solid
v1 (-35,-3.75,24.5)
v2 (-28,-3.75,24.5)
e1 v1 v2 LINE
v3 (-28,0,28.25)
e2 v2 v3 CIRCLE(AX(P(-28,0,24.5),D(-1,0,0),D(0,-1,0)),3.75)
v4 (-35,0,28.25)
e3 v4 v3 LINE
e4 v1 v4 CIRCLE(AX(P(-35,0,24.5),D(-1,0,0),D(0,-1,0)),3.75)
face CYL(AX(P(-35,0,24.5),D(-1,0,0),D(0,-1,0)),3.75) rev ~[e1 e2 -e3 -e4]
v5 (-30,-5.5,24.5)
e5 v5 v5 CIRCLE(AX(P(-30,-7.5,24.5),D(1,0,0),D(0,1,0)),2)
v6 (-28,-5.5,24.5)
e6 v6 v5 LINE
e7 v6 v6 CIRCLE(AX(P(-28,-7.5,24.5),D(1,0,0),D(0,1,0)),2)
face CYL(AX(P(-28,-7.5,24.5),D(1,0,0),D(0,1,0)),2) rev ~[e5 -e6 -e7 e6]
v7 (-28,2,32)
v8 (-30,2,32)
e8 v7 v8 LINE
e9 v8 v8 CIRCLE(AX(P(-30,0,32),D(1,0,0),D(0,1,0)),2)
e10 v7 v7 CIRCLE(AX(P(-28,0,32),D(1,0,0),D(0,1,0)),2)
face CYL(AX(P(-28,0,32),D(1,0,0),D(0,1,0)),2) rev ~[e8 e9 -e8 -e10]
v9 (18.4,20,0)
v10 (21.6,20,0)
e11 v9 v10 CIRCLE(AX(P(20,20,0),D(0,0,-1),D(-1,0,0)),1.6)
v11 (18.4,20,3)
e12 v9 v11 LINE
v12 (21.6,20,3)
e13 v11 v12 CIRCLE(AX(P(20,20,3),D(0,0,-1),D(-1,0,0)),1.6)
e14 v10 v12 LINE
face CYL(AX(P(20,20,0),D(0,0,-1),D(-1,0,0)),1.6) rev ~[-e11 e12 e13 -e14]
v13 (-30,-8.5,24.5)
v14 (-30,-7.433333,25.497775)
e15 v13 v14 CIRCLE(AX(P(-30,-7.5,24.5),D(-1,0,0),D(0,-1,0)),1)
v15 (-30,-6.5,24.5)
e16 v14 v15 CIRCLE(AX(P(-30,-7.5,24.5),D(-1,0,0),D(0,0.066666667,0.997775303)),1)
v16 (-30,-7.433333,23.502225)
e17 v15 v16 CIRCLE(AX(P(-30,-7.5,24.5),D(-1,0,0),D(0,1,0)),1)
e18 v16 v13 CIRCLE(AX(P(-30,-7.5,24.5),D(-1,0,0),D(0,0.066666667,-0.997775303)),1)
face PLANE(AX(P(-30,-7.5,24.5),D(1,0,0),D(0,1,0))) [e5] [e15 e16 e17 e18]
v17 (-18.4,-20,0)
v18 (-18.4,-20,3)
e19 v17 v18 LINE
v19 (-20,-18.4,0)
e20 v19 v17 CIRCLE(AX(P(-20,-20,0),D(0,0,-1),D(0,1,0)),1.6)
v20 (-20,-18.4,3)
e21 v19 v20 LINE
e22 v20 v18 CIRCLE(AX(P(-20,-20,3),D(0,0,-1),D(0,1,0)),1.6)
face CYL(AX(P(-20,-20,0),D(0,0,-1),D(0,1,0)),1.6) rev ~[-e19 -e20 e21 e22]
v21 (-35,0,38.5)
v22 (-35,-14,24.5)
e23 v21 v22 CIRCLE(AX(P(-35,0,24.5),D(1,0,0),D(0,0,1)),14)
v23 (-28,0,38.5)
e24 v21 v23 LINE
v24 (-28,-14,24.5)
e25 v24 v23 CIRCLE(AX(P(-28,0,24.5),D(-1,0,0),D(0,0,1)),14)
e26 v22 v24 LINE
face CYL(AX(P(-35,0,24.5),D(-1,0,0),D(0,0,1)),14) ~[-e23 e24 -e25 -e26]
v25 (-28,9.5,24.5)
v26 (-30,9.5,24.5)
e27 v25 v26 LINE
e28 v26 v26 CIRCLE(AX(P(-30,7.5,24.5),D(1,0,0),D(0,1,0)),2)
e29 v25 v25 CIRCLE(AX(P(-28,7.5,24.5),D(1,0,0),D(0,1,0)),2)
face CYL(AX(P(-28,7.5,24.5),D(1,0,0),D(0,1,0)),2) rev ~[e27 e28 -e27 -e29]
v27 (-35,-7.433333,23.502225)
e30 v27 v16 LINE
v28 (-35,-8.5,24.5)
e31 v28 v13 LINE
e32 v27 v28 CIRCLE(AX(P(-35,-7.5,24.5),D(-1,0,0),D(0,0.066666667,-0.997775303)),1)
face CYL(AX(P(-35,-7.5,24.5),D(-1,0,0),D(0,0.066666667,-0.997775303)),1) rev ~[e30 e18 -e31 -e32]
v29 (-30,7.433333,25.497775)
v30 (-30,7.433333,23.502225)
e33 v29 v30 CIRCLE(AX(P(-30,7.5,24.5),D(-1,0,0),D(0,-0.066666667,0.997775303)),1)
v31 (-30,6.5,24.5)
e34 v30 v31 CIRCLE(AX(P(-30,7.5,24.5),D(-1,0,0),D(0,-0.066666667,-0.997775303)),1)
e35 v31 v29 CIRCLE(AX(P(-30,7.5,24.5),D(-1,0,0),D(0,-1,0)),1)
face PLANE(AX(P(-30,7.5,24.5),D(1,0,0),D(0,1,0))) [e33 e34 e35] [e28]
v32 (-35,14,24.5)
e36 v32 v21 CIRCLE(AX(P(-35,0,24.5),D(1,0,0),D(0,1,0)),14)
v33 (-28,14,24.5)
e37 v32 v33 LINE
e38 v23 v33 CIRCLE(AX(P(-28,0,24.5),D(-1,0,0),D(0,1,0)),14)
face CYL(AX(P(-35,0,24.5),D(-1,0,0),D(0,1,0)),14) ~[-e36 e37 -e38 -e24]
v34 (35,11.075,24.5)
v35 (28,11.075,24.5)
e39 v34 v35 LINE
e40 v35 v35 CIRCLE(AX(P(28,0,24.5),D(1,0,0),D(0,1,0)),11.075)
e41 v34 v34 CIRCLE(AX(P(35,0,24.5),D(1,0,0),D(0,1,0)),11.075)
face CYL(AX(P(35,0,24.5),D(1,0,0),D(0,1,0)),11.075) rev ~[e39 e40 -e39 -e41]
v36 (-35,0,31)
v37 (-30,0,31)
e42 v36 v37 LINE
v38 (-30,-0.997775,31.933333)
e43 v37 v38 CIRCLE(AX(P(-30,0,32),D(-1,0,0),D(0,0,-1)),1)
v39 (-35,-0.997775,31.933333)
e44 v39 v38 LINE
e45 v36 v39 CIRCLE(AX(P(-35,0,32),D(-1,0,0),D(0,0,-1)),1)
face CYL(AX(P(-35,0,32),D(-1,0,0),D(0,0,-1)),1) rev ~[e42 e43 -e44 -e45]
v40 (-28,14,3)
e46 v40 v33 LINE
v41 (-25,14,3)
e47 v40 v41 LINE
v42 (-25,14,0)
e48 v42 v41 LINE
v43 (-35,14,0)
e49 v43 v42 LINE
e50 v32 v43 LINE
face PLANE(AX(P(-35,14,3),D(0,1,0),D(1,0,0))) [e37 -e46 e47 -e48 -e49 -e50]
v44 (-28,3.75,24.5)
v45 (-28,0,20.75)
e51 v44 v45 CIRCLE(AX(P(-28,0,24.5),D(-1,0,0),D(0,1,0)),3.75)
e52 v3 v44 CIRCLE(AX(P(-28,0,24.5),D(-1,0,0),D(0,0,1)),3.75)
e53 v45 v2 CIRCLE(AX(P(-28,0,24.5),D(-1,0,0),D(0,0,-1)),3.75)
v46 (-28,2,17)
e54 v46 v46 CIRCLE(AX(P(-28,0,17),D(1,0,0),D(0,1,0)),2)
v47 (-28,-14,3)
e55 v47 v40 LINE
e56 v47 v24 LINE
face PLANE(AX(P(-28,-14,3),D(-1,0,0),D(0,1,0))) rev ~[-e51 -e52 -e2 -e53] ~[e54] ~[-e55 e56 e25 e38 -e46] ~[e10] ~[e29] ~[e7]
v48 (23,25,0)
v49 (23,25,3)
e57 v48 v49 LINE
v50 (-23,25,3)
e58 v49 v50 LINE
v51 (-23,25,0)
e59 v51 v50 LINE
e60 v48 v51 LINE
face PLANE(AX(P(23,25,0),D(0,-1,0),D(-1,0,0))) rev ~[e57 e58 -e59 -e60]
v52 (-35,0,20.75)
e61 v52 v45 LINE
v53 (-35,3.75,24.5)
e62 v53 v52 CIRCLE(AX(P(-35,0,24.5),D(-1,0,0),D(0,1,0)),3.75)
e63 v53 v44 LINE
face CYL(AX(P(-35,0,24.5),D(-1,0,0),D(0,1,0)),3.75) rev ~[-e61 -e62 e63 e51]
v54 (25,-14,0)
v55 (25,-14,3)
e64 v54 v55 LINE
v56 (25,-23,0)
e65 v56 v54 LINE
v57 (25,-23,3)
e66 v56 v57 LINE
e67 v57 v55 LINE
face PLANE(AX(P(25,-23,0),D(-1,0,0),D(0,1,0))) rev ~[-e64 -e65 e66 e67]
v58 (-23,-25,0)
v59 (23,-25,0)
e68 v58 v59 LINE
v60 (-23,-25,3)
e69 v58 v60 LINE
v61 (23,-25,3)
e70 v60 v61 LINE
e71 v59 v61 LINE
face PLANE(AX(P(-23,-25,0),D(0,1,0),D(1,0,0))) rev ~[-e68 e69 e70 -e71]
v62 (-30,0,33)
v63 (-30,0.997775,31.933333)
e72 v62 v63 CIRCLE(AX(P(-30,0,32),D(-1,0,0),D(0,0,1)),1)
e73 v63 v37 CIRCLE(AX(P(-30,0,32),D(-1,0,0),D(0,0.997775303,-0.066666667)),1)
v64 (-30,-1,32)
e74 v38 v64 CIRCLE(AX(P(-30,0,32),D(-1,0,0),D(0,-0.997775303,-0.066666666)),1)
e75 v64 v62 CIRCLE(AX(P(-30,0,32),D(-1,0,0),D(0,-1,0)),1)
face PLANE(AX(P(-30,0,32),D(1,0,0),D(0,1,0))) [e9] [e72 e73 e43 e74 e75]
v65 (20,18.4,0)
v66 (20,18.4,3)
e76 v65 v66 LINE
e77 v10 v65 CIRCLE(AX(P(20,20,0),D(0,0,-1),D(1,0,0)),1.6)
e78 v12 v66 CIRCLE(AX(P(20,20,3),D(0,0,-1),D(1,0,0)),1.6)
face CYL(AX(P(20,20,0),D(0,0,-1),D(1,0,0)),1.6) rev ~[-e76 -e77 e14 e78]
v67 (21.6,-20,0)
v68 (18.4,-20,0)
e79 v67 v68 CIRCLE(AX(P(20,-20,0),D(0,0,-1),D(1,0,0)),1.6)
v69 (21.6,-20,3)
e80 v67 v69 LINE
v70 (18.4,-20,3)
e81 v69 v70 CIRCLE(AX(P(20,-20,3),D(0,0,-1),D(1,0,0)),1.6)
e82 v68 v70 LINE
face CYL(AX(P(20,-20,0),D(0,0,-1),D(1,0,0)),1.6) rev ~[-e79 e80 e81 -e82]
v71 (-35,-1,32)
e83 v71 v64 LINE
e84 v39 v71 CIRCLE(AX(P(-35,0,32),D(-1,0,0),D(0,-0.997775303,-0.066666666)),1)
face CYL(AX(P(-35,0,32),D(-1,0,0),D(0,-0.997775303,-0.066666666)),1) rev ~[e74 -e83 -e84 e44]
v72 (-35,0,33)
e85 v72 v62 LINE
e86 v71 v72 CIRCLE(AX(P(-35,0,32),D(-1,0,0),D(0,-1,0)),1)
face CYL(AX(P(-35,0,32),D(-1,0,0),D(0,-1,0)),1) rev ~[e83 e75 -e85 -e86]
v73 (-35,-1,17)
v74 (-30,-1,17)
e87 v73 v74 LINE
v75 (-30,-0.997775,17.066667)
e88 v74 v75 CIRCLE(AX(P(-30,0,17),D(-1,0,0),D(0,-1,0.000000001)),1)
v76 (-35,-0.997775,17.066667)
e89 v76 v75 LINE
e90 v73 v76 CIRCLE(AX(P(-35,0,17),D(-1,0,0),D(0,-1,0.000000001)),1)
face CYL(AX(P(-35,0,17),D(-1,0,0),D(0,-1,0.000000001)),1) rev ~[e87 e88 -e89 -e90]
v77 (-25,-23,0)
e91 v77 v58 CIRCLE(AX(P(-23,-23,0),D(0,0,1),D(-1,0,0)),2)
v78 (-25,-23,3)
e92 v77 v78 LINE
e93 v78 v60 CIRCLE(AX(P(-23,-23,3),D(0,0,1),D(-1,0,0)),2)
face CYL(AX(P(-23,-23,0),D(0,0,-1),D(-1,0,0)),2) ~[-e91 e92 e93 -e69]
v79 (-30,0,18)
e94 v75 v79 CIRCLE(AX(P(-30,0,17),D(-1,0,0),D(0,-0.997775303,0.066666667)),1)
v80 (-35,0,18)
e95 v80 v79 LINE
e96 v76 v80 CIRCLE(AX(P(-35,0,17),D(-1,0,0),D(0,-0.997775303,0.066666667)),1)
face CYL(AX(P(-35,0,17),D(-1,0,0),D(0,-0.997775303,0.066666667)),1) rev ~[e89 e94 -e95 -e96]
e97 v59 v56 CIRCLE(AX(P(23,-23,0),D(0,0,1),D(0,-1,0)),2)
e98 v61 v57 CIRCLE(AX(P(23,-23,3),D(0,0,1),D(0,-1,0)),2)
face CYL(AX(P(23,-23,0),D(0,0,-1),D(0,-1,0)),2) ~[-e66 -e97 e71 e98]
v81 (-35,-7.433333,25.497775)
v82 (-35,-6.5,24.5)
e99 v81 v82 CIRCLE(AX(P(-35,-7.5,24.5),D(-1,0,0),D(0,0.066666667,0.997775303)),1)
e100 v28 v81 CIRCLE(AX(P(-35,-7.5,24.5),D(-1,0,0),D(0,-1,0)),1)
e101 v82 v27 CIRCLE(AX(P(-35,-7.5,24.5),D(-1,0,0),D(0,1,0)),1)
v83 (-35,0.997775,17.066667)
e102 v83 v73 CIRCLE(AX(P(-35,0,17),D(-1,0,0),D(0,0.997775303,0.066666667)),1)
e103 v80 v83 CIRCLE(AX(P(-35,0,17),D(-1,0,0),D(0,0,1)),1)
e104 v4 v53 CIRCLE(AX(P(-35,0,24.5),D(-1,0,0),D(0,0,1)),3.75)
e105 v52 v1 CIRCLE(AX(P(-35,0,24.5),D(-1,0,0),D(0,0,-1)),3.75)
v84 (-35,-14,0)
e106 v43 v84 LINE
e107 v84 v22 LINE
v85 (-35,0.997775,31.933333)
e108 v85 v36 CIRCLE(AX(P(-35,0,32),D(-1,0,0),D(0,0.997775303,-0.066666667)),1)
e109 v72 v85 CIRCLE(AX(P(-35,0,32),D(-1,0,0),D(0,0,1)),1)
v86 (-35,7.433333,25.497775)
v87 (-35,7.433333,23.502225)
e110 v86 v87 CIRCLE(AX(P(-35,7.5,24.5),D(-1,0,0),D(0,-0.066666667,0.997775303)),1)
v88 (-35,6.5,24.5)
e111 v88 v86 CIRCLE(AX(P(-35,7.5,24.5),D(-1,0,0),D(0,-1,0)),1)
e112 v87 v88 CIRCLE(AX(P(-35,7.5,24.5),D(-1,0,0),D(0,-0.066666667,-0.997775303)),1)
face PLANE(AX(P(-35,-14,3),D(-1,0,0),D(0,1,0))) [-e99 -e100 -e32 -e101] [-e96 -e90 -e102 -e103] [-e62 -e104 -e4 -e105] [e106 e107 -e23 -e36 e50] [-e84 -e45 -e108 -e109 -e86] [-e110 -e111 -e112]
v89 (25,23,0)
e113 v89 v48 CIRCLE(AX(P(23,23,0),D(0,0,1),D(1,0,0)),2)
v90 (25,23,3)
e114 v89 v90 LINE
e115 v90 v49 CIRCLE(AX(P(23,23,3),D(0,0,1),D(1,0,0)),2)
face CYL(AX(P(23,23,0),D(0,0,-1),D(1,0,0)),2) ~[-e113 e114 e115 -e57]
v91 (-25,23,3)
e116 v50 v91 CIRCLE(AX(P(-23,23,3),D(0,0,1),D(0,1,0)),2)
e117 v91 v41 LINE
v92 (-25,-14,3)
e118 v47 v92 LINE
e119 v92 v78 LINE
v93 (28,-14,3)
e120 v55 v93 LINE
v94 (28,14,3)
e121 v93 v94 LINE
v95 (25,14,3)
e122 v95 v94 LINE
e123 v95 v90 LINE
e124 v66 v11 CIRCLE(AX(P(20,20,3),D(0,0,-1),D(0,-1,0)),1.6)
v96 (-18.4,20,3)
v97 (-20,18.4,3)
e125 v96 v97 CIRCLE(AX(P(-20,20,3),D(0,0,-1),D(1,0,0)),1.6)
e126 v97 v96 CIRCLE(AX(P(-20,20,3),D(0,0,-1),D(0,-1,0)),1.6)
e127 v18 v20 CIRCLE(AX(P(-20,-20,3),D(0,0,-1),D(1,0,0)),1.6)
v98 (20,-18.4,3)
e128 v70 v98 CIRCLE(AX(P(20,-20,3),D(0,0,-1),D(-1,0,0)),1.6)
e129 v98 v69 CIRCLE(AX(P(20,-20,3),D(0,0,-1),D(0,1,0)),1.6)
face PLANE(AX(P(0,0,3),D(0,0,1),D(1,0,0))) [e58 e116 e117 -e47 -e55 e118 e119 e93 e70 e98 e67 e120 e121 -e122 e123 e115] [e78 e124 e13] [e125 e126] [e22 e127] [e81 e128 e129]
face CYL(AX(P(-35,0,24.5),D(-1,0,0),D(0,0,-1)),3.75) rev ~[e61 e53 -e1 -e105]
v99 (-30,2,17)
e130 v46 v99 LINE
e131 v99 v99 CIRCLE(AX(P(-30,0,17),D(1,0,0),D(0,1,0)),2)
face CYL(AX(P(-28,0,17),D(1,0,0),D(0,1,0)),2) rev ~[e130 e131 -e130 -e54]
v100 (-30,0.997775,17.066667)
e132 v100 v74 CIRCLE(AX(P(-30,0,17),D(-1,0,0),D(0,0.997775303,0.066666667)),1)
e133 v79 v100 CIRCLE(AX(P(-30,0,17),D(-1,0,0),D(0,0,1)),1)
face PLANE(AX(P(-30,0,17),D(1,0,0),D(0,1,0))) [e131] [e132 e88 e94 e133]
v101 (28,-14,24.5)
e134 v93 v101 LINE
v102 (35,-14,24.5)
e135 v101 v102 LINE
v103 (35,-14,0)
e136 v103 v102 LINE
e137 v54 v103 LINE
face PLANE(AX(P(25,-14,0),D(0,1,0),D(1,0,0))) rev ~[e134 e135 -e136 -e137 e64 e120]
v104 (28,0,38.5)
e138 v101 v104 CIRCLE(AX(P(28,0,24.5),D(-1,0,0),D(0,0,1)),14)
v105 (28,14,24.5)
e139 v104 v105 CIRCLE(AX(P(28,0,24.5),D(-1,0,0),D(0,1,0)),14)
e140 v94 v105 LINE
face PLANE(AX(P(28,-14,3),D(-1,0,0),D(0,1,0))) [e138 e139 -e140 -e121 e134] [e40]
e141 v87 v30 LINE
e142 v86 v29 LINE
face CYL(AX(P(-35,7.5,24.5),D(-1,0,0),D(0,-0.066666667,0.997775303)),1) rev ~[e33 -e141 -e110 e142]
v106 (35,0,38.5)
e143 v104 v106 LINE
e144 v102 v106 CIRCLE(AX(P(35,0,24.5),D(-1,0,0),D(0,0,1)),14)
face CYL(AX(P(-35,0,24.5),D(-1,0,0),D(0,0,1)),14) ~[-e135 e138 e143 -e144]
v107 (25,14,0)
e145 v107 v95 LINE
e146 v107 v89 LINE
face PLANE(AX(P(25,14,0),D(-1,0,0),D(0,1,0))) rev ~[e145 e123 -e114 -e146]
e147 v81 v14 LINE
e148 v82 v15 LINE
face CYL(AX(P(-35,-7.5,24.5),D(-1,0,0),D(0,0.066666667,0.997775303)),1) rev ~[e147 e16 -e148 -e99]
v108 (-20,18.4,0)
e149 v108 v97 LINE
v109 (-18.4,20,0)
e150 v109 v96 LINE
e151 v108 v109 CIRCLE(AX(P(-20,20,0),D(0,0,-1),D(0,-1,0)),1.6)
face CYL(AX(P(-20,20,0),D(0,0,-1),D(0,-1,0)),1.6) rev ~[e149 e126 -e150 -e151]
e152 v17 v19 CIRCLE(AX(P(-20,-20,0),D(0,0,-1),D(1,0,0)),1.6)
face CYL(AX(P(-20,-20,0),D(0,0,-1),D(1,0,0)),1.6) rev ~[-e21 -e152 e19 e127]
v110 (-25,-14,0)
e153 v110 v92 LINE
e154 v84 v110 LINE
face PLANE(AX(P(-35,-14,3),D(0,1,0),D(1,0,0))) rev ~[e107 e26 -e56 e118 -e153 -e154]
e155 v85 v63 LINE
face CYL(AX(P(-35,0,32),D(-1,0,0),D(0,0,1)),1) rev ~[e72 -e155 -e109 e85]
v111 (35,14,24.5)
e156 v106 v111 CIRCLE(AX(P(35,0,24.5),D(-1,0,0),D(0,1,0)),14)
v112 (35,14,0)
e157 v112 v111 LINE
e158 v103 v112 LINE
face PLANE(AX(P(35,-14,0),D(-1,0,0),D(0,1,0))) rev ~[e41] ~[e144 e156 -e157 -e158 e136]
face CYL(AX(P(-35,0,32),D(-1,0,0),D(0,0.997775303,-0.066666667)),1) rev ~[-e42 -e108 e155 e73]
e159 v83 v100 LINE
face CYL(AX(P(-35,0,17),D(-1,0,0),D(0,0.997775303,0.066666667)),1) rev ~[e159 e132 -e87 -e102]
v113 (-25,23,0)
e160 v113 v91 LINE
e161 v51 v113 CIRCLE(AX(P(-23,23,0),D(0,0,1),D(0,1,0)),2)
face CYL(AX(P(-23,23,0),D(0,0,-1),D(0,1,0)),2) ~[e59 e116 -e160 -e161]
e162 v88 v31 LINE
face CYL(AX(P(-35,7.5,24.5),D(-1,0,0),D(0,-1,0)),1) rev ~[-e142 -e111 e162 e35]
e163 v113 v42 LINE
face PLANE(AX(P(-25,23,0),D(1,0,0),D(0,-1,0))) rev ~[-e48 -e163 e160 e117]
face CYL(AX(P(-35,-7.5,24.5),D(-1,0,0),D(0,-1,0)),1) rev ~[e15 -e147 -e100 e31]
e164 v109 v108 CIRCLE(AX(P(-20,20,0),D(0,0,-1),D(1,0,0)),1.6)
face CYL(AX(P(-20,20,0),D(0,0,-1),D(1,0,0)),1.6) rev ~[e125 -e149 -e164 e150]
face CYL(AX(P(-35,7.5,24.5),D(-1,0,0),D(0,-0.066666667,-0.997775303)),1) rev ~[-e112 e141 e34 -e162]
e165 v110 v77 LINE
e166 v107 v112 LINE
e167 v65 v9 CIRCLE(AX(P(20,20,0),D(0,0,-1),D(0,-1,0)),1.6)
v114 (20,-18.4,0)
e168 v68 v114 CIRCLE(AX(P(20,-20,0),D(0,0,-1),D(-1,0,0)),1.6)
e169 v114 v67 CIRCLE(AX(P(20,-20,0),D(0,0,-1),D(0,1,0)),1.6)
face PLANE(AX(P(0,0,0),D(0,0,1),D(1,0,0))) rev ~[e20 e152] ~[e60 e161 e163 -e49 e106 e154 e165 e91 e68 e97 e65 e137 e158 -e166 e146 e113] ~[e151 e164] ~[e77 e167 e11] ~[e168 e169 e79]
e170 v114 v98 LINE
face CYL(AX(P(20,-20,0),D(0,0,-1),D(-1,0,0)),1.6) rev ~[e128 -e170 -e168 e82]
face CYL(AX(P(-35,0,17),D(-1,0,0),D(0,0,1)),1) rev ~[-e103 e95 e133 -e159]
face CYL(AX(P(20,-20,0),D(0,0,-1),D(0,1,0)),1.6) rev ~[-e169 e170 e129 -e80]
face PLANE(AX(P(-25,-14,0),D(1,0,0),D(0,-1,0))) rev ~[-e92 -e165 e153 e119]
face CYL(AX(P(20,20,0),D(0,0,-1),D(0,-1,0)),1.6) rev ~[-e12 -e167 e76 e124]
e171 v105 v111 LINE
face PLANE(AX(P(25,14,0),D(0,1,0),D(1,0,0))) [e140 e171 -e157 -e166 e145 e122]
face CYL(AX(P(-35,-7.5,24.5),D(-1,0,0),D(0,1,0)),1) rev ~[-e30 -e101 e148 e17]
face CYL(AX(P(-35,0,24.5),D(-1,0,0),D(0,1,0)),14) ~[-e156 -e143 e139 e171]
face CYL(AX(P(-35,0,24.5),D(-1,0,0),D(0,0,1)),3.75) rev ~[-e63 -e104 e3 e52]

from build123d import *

# Parameters (mm, degrees)
F0_W      = 10
F0_H      = 14
F1_DEPTH  = 3
F2_W      = 7
F2_H      = 28
F3_DEPTH  = 35.5
F5_DEPTH  = 70.001
F6_R      = 11.075
F7_DEPTH  = 7
F9_DEPTH  = 25
F10_R     = 2
F11_DEPTH = 2


with BuildPart() as f1:
    # F0 (on Top) → F1 (new body)
    with BuildSketch(Plane.XY):
        with BuildLine():
            ThreePointArc((25, 23), (24.4142135624, 24.4142135624), (23, 25))
            Line((23, 25), (-23, 25))
            ThreePointArc((-23, 25), (-24.4142135624, 24.4142135624), (-25, 23))
            Line((-25, 23), (-25, 14))
            Line((-25, 14), (-25, 0))
            Line((-25, 0), (-25, -14))
            Line((-25, -14), (-25, -23))
            ThreePointArc((-25, -23), (-24.4142135624, -24.4142135624), (-23, -25))
            Line((-23, -25), (23, -25))
            ThreePointArc((23, -25), (24.4142135624, -24.4142135624), (25, -23))
            Line((25, -23), (25, -14))
            Line((25, -14), (25, 0))
            Line((25, 0), (25, 14))
            Line((25, 14), (25, 23))
        make_face()
        with BuildLine():
            ThreePointArc((-20, 18.4), (-21.1313708499, 21.1313708499), (-18.4, 20))
            Line((-18.4, 20), (18.4, 20))
            ThreePointArc((18.4, 20), (20, 21.6), (21.6, 20))
            ThreePointArc((21.6, 20), (21.1313708499, 18.8686291501), (20, 18.4))
            Line((20, 18.4), (20, -18.4))
            ThreePointArc((20, -18.4), (21.1313708499, -18.8686291501), (21.6, -20))
            ThreePointArc((21.6, -20), (20, -21.6), (18.4, -20))
            Line((18.4, -20), (-18.4, -20))
            ThreePointArc((-18.4, -20), (-21.1313708499, -21.1313708499), (-20, -18.4))
            Line((-20, -18.4), (-20, 18.4))
        make_face(mode=Mode.SUBTRACT)
        with Locations((30, 7)):
            Rectangle(F0_W, F0_H)
        with Locations((-30, 7)):
            Rectangle(F0_W, F0_H)
        with Locations((30, -7)):
            Rectangle(F0_W, F0_H)
        with Locations((-30, -7)):
            Rectangle(F0_W, F0_H)
        with BuildLine():
            Line((18.4, 20), (-18.4, 20))
            ThreePointArc((-18.4, 20), (-18.8686291501, 18.8686291501), (-20, 18.4))
            Line((-20, 18.4), (-20, -18.4))
            ThreePointArc((-20, -18.4), (-18.8686291501, -18.8686291501), (-18.4, -20))
            Line((-18.4, -20), (18.4, -20))
            ThreePointArc((18.4, -20), (18.8686291501, -18.8686291501), (20, -18.4))
            Line((20, -18.4), (20, 18.4))
            ThreePointArc((20, 18.4), (18.8686291501, 18.8686291501), (18.4, 20))
        make_face()
    extrude(amount=F1_DEPTH)

    # F2 (on face) → F3 (join)
    with BuildSketch(Plane.XY.offset(3)):
        with Locations((-31.5, 0)):
            Rectangle(F2_W, F2_H)
        with Locations((31.5, 0)):
            Rectangle(F2_W, F2_H)
    extrude(amount=F3_DEPTH)

    # F4 (on face) → F5 (cut, through all)
    with BuildSketch(Plane(origin=(-35, 0, 0), x_dir=(0, -1, 0), z_dir=(-1, 0, 0))):
        with BuildLine():
            Line((14, 38.5), (0, 38.5))
            ThreePointArc((0, 38.5), (9.8994949366, 34.3994949366), (14, 24.5))
            Line((14, 24.5), (14, 38.5))
        make_face()
        with BuildLine():
            ThreePointArc((-14, 24.5), (-9.8994949366, 34.3994949366), (0, 38.5))
            Line((0, 38.5), (-14, 38.5))
            Line((-14, 38.5), (-14, 24.5))
        make_face()
    extrude(amount=-F5_DEPTH, mode=Mode.SUBTRACT)

    # F6 (on face) → F7 (cut, through all)
    with BuildSketch(Plane.YZ.offset(35)):
        with Locations((0, 24.5)):
            Circle(F6_R)
    extrude(amount=-F7_DEPTH, mode=Mode.SUBTRACT)

    # F8 (on face) → F9 (cut)
    with BuildSketch(Plane(origin=(-35, 0, 0), x_dir=(0, -1, 0), z_dir=(-1, 0, 0))):
        with BuildLine():
            ThreePointArc((1, 32), (0.7071067812, 32.7071067812), (0, 33))
            Line((0, 33), (0, 32))
            ThreePointArc((0, 32), (0.5, 31.9833147735), (0.9977753031, 31.9333333333))
            ThreePointArc((0.9977753031, 31.9333333333), (0.999443671, 31.966648112), (1, 32))
        make_face()
        with BuildLine():
            Line((0, 32), (0, 33))
            ThreePointArc((0, 33), (-0.7302967433, 32.6831300511), (-0.9977753031, 31.9333333333))
            ThreePointArc((-0.9977753031, 31.9333333333), (-0.5, 31.9833147735), (0, 32))
        make_face()
        with BuildLine():
            Line((0, 31), (0, 32))
            ThreePointArc((0, 32), (-0.5, 31.9833147735), (-0.9977753031, 31.9333333333))
            ThreePointArc((-0.9977753031, 31.9333333333), (-0.6831300511, 31.2697032567), (0, 31))
        make_face()
        with BuildLine():
            ThreePointArc((0.9977753031, 31.9333333333), (0.5, 31.9833147735), (0, 32))
            Line((0, 32), (0, 31))
            ThreePointArc((0, 31), (0.6831300511, 31.2697032567), (0.9977753031, 31.9333333333))
        make_face()
        with BuildLine():
            ThreePointArc((-6.5, 24.5), (-6.7697032567, 25.1831300511), (-7.4333333333, 25.4977753031))
            ThreePointArc((-7.4333333333, 25.4977753031), (-7.4833147735, 25), (-7.5, 24.5))
            Line((-7.5, 24.5), (-6.5, 24.5))
        make_face()
        with BuildLine():
            ThreePointArc((-7.5, 24.5), (-7.4833147735, 25), (-7.4333333333, 25.4977753031))
            ThreePointArc((-7.4333333333, 25.4977753031), (-8.5, 24.5), (-7.4333333333, 23.5022246969))
            ThreePointArc((-7.4333333333, 23.5022246969), (-7.4833147735, 24), (-7.5, 24.5))
        make_face()
        with BuildLine():
            ThreePointArc((8.5, 24.5), (8.1831300511, 25.2302967433), (7.4333333333, 25.4977753031))
            ThreePointArc((7.4333333333, 25.4977753031), (7.4833147735, 25), (7.5, 24.5))
            ThreePointArc((7.5, 24.5), (7.4833147735, 24), (7.4333333333, 23.5022246969))
            ThreePointArc((7.4333333333, 23.5022246969), (8.1831300511, 23.7697032567), (8.5, 24.5))
        make_face()
        with BuildLine():
            ThreePointArc((7.5, 24.5), (7.4833147735, 25), (7.4333333333, 25.4977753031))
            ThreePointArc((7.4333333333, 25.4977753031), (6.7697032567, 25.1831300511), (6.5, 24.5))
            Line((6.5, 24.5), (7.5, 24.5))
        make_face()
        with BuildLine():
            ThreePointArc((3.75, 24.5), (2.6516504294, 27.1516504294), (0, 28.25))
            Line((0, 28.25), (0, 24.5))
            Line((0, 24.5), (3.75, 24.5))
        make_face()
        with BuildLine():
            Line((0, 24.5), (0, 28.25))
            ThreePointArc((0, 28.25), (-2.6516504294, 27.1516504294), (-3.75, 24.5))
            Line((-3.75, 24.5), (0, 24.5))
        make_face()
        with BuildLine():
            Line((-6.5, 24.5), (-7.5, 24.5))
            ThreePointArc((-7.5, 24.5), (-7.4833147735, 24), (-7.4333333333, 23.5022246969))
            ThreePointArc((-7.4333333333, 23.5022246969), (-6.7697032567, 23.8168699489), (-6.5, 24.5))
        make_face()
        with BuildLine():
            ThreePointArc((7.4333333333, 23.5022246969), (7.4833147735, 24), (7.5, 24.5))
            Line((7.5, 24.5), (6.5, 24.5))
            ThreePointArc((6.5, 24.5), (6.7697032567, 23.8168699489), (7.4333333333, 23.5022246969))
        make_face()
        with BuildLine():
            Line((3.75, 24.5), (0, 24.5))
            Line((0, 24.5), (0, 20.75))
            ThreePointArc((0, 20.75), (2.6516504294, 21.8483495706), (3.75, 24.5))
        make_face()
        with BuildLine():
            Line((0, 20.75), (0, 24.5))
            Line((0, 24.5), (-3.75, 24.5))
            ThreePointArc((-3.75, 24.5), (-2.6516504294, 21.8483495706), (0, 20.75))
        make_face()
        with BuildLine():
            ThreePointArc((0, 18), (-0.6831300511, 17.7302967433), (-0.9977753031, 17.0666666667))
            ThreePointArc((-0.9977753031, 17.0666666667), (-0.5, 17.0166852265), (0, 17))
            Line((0, 17), (0, 18))
        make_face()
        with BuildLine():
            ThreePointArc((0, 17), (-0.5, 17.0166852265), (-0.9977753031, 17.0666666667))
            ThreePointArc((-0.9977753031, 17.0666666667), (-0.033351888, 16.000556329), (1, 17))
            ThreePointArc((1, 17), (0.999443671, 17.033351888), (0.9977753031, 17.0666666667))
            ThreePointArc((0.9977753031, 17.0666666667), (0.5, 17.0166852265), (0, 17))
        make_face()
        with BuildLine():
            Line((0, 18), (0, 17))
            ThreePointArc((0, 17), (0.5, 17.0166852265), (0.9977753031, 17.0666666667))
            ThreePointArc((0.9977753031, 17.0666666667), (0.6831300511, 17.7302967433), (0, 18))
        make_face()
    extrude(amount=-F9_DEPTH, mode=Mode.SUBTRACT)

    # F10 (on face) → F11 (cut)
    with BuildSketch(Plane.YZ.offset(-28)):
        with Locations((-7.5, 24.5)):
            Circle(F10_R)
        with Locations((0, 17)):
            Circle(F10_R)
        with Locations((0, 32)):
            Circle(F10_R)
        with Locations((7.5, 24.5)):
            Circle(F10_R)
    extrude(amount=-F11_DEPTH, mode=Mode.SUBTRACT)


solid = f1.part
